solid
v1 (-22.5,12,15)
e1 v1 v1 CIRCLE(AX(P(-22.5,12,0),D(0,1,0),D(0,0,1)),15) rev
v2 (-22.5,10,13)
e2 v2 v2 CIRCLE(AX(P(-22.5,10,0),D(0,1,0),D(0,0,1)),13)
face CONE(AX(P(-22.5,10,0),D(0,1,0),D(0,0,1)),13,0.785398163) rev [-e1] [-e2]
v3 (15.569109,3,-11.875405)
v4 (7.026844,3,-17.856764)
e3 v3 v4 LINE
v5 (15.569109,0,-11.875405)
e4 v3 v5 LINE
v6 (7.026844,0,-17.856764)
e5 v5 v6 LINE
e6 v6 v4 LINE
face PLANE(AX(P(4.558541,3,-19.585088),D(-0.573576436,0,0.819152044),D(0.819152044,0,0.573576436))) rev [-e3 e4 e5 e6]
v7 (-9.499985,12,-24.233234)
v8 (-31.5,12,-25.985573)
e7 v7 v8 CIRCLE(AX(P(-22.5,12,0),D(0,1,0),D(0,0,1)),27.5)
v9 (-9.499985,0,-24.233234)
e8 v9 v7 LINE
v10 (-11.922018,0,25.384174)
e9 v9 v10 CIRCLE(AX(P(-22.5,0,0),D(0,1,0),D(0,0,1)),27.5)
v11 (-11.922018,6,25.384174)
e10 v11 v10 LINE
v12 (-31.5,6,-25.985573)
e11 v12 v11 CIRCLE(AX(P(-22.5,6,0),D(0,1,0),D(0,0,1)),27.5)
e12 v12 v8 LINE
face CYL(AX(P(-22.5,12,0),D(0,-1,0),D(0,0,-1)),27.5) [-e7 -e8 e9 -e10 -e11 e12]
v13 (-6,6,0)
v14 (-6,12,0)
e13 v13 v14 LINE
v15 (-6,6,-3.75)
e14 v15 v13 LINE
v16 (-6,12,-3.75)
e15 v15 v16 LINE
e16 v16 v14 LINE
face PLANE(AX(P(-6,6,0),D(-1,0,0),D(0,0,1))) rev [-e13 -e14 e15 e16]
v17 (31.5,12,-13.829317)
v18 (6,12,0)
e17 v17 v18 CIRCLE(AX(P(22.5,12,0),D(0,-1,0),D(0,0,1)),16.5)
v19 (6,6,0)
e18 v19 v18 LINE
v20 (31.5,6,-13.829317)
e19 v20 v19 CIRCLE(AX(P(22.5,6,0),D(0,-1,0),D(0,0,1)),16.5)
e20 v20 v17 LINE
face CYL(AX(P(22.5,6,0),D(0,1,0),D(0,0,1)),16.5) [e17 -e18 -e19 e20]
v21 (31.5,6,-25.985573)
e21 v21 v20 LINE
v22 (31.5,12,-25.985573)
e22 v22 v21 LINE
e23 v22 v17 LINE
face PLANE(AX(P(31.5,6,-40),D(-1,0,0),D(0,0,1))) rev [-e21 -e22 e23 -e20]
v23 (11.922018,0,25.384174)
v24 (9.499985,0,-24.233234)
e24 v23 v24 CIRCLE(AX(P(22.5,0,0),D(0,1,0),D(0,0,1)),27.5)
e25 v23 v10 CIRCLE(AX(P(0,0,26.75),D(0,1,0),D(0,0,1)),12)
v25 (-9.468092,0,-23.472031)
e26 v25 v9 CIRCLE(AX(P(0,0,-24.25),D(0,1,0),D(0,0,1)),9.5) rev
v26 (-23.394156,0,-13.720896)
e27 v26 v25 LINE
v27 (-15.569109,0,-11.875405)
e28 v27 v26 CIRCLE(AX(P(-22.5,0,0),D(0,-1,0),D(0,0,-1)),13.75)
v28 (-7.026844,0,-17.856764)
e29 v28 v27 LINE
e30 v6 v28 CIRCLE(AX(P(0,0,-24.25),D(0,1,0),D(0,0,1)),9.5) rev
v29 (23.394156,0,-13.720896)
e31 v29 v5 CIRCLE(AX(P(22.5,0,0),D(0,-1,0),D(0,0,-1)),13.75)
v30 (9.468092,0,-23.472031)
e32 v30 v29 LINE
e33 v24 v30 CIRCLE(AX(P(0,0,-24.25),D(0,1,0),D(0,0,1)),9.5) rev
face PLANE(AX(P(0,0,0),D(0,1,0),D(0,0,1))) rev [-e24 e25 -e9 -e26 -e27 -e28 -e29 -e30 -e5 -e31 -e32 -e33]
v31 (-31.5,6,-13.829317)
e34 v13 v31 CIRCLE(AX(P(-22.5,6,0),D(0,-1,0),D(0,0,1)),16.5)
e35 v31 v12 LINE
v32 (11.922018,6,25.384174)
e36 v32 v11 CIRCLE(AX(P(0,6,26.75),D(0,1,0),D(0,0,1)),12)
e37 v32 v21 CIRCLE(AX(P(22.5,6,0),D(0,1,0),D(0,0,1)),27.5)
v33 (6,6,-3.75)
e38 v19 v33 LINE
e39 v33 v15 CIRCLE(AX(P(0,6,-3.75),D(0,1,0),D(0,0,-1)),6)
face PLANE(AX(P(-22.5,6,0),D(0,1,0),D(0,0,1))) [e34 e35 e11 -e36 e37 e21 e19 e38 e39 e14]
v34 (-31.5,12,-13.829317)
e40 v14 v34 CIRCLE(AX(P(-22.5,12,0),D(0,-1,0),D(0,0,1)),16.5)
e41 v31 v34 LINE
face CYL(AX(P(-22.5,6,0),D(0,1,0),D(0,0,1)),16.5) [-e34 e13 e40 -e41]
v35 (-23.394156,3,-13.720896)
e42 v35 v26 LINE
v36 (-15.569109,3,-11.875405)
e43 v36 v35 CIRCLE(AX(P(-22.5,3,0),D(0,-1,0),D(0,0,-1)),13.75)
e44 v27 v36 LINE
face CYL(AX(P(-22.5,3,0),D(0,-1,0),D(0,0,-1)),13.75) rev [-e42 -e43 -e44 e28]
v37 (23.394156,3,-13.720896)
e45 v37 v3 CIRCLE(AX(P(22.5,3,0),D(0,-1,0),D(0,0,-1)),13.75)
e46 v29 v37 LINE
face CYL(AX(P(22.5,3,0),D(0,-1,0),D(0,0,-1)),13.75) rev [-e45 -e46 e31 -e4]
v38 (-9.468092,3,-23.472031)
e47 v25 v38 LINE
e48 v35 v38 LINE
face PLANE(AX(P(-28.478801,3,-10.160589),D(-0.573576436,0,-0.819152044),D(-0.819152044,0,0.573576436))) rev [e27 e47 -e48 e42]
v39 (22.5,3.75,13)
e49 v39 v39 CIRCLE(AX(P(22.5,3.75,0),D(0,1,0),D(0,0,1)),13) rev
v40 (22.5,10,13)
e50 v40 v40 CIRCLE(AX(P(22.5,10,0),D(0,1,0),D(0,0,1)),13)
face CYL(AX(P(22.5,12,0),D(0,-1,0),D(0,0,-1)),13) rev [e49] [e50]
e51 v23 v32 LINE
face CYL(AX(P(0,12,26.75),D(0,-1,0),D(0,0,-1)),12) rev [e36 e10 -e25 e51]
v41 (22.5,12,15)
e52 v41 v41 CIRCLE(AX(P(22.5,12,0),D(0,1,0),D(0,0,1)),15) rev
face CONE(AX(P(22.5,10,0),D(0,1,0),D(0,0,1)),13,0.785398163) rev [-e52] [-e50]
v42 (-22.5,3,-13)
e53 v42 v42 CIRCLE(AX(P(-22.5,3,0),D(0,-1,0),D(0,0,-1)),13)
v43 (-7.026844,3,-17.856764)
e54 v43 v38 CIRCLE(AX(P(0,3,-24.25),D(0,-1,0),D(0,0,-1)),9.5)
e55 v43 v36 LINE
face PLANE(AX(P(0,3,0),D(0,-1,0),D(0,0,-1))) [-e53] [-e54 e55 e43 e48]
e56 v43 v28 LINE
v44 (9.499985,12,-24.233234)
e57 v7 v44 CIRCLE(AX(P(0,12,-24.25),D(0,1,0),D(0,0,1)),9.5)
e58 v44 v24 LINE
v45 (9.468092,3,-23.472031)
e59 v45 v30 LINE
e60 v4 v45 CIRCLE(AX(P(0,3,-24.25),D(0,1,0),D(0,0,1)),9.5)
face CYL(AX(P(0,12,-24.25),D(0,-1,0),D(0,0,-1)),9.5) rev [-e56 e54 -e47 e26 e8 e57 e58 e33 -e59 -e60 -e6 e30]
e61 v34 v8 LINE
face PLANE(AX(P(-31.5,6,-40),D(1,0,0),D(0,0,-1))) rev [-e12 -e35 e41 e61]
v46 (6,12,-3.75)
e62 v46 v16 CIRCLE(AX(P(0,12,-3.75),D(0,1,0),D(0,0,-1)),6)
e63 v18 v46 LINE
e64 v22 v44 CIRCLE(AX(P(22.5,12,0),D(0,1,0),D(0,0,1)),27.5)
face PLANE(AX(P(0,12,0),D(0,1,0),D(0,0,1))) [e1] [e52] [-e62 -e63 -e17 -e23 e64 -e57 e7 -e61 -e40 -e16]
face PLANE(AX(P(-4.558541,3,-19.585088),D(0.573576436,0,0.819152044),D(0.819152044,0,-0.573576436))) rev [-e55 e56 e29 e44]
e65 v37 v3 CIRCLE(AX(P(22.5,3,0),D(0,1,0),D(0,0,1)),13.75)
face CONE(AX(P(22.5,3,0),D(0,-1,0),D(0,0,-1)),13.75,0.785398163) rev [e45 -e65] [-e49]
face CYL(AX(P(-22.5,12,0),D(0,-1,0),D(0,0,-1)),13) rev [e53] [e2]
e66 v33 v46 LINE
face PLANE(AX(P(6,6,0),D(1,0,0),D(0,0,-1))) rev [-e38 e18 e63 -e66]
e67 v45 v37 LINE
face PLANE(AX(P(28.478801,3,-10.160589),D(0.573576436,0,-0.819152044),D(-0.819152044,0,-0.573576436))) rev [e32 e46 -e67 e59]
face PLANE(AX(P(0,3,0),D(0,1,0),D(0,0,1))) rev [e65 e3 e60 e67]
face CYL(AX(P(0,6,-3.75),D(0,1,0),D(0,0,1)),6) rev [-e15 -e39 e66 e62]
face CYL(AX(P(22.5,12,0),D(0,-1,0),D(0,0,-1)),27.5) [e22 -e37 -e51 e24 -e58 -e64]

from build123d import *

# Parameters (mm, degrees)
EXTRUDE_1_DEPTH     = 12
SKETCH_2_R          = 9.5
SKETCH_2_R_2        = 12
CUT_EXTRUDE_1_DEPTH = 59.311662641
CUT_EXTRUDE_2_DEPTH = 6
SKETCH_4_R          = 13
CUT_EXTRUDE_3_DEPTH = 59.311662641
CHAMFER_1_SIZE      = 2
CUT_EXTRUDE_4_DEPTH = 3
SKETCH_7_R          = 13.75
CUT_EXTRUDE_5_DEPTH = 3
CHAMFER_2_SIZE      = 0.75


with BuildPart() as part:
    # Эскиз1 → Бобышка-Вытянуть1 (new body)
    with BuildSketch(Plane(origin=(0, 0, 0), x_dir=(1, 0, 0), z_dir=(0, 1, 0))):
        with BuildLine():
            ThreePointArc((0, -15.811388301), (50, 0), (0, 15.811388301))
            ThreePointArc((0, 15.811388301), (-50, 0), (0, -15.811388301))
        make_face()
    extrude(amount=EXTRUDE_1_DEPTH)

    # Эскиз2 → Вырез-Вытянуть1 (cut, through all)
    with BuildSketch(Plane(origin=(0, 0, 0), x_dir=(1, 0, 0), z_dir=(0, 1, 0))):
        with Locations((0, 24.25)):
            Circle(SKETCH_2_R)
        with Locations((0, -26.75)):
            Circle(SKETCH_2_R_2)
    extrude(amount=CUT_EXTRUDE_1_DEPTH, mode=Mode.SUBTRACT)

    # Эскиз3 → Вырез-Вытянуть2 (cut)
    with BuildSketch(Plane(origin=(0, 12, 0), x_dir=(1, 0, 0), z_dir=(0, 1, 0))):
        with BuildLine():
            Line((-6, 0), (-6, 3.75))
            ThreePointArc((-6, 3.75), (0, 9.75), (6, 3.75))
            Line((6, 3.75), (6, 0))
            ThreePointArc((6, 0), (30.366066361, -14.504309704), (31.5, 13.829316686))
            Line((31.5, 13.829316686), (31.5, 40))
            Line((31.5, 40), (71.5, 40))
            Line((71.5, 40), (71.5, -30))
            Line((71.5, -30), (-71.5, -30))
            Line((-71.5, -30), (-71.5, 40))
            Line((-71.5, 40), (-31.5, 40))
            Line((-31.5, 40), (-31.5, 13.829316686))
            ThreePointArc((-31.5, 13.829316686), (-30.366066361, -14.504309704), (-6, 0))
        make_face()
    extrude(amount=-CUT_EXTRUDE_2_DEPTH, mode=Mode.SUBTRACT)

    # Эскиз4 → Вырез-Вытянуть3 (cut, through all)
    with BuildSketch(Plane(origin=(0, 0, 0), x_dir=(1, 0, 0), z_dir=(0, 1, 0))):
        with Locations(Location((-22.5, 0, 0), (0, 0, 270))):
            Circle(SKETCH_4_R)
        with Locations(Location((22.5, 0, 0), (0, 0, 270))):
            Circle(SKETCH_4_R)
    extrude(amount=CUT_EXTRUDE_3_DEPTH, mode=Mode.SUBTRACT)

    # Фаска1
    chamfer_1_edges = [part.edges().sort_by_distance(p)[0] for p in [
        (-22.5, 12, -13),
        (22.5, 12, -13),
    ]]
    chamfer(chamfer_1_edges, length=CHAMFER_1_SIZE)

    # Эскиз5 → Вырез-Вытянуть4 (cut)
    with BuildSketch(Plane.XZ):
        Polygon((-4.558541382, -19.585087734), (-25.037342489, -5.245676825), (-28.478801107, -10.160589091), (-8, -24.5), align=None)
        Polygon((4.558541382, -19.585087734), (25.037342489, -5.245676825), (28.478801107, -10.160589091), (8, -24.5), align=None)
    extrude(amount=-CUT_EXTRUDE_4_DEPTH, mode=Mode.SUBTRACT)

    # Эскиз7 → Вырез-Вытянуть5 (cut)
    with BuildSketch(Plane.XZ):
        with Locations((-22.5, 0)):
            Circle(SKETCH_7_R)
        with Locations((22.5, 0)):
            Circle(SKETCH_7_R)
    extrude(amount=-CUT_EXTRUDE_5_DEPTH, mode=Mode.SUBTRACT)

    # Фаска2
    chamfer_2_edges = [part.edges().sort_by_distance(p)[0] for p in [
        (22.5, 3, -13),
    ]]
    chamfer(chamfer_2_edges, length=CHAMFER_2_SIZE - 0.0001)  # a hair under: the kernel refuses the full size


solid = part.part
